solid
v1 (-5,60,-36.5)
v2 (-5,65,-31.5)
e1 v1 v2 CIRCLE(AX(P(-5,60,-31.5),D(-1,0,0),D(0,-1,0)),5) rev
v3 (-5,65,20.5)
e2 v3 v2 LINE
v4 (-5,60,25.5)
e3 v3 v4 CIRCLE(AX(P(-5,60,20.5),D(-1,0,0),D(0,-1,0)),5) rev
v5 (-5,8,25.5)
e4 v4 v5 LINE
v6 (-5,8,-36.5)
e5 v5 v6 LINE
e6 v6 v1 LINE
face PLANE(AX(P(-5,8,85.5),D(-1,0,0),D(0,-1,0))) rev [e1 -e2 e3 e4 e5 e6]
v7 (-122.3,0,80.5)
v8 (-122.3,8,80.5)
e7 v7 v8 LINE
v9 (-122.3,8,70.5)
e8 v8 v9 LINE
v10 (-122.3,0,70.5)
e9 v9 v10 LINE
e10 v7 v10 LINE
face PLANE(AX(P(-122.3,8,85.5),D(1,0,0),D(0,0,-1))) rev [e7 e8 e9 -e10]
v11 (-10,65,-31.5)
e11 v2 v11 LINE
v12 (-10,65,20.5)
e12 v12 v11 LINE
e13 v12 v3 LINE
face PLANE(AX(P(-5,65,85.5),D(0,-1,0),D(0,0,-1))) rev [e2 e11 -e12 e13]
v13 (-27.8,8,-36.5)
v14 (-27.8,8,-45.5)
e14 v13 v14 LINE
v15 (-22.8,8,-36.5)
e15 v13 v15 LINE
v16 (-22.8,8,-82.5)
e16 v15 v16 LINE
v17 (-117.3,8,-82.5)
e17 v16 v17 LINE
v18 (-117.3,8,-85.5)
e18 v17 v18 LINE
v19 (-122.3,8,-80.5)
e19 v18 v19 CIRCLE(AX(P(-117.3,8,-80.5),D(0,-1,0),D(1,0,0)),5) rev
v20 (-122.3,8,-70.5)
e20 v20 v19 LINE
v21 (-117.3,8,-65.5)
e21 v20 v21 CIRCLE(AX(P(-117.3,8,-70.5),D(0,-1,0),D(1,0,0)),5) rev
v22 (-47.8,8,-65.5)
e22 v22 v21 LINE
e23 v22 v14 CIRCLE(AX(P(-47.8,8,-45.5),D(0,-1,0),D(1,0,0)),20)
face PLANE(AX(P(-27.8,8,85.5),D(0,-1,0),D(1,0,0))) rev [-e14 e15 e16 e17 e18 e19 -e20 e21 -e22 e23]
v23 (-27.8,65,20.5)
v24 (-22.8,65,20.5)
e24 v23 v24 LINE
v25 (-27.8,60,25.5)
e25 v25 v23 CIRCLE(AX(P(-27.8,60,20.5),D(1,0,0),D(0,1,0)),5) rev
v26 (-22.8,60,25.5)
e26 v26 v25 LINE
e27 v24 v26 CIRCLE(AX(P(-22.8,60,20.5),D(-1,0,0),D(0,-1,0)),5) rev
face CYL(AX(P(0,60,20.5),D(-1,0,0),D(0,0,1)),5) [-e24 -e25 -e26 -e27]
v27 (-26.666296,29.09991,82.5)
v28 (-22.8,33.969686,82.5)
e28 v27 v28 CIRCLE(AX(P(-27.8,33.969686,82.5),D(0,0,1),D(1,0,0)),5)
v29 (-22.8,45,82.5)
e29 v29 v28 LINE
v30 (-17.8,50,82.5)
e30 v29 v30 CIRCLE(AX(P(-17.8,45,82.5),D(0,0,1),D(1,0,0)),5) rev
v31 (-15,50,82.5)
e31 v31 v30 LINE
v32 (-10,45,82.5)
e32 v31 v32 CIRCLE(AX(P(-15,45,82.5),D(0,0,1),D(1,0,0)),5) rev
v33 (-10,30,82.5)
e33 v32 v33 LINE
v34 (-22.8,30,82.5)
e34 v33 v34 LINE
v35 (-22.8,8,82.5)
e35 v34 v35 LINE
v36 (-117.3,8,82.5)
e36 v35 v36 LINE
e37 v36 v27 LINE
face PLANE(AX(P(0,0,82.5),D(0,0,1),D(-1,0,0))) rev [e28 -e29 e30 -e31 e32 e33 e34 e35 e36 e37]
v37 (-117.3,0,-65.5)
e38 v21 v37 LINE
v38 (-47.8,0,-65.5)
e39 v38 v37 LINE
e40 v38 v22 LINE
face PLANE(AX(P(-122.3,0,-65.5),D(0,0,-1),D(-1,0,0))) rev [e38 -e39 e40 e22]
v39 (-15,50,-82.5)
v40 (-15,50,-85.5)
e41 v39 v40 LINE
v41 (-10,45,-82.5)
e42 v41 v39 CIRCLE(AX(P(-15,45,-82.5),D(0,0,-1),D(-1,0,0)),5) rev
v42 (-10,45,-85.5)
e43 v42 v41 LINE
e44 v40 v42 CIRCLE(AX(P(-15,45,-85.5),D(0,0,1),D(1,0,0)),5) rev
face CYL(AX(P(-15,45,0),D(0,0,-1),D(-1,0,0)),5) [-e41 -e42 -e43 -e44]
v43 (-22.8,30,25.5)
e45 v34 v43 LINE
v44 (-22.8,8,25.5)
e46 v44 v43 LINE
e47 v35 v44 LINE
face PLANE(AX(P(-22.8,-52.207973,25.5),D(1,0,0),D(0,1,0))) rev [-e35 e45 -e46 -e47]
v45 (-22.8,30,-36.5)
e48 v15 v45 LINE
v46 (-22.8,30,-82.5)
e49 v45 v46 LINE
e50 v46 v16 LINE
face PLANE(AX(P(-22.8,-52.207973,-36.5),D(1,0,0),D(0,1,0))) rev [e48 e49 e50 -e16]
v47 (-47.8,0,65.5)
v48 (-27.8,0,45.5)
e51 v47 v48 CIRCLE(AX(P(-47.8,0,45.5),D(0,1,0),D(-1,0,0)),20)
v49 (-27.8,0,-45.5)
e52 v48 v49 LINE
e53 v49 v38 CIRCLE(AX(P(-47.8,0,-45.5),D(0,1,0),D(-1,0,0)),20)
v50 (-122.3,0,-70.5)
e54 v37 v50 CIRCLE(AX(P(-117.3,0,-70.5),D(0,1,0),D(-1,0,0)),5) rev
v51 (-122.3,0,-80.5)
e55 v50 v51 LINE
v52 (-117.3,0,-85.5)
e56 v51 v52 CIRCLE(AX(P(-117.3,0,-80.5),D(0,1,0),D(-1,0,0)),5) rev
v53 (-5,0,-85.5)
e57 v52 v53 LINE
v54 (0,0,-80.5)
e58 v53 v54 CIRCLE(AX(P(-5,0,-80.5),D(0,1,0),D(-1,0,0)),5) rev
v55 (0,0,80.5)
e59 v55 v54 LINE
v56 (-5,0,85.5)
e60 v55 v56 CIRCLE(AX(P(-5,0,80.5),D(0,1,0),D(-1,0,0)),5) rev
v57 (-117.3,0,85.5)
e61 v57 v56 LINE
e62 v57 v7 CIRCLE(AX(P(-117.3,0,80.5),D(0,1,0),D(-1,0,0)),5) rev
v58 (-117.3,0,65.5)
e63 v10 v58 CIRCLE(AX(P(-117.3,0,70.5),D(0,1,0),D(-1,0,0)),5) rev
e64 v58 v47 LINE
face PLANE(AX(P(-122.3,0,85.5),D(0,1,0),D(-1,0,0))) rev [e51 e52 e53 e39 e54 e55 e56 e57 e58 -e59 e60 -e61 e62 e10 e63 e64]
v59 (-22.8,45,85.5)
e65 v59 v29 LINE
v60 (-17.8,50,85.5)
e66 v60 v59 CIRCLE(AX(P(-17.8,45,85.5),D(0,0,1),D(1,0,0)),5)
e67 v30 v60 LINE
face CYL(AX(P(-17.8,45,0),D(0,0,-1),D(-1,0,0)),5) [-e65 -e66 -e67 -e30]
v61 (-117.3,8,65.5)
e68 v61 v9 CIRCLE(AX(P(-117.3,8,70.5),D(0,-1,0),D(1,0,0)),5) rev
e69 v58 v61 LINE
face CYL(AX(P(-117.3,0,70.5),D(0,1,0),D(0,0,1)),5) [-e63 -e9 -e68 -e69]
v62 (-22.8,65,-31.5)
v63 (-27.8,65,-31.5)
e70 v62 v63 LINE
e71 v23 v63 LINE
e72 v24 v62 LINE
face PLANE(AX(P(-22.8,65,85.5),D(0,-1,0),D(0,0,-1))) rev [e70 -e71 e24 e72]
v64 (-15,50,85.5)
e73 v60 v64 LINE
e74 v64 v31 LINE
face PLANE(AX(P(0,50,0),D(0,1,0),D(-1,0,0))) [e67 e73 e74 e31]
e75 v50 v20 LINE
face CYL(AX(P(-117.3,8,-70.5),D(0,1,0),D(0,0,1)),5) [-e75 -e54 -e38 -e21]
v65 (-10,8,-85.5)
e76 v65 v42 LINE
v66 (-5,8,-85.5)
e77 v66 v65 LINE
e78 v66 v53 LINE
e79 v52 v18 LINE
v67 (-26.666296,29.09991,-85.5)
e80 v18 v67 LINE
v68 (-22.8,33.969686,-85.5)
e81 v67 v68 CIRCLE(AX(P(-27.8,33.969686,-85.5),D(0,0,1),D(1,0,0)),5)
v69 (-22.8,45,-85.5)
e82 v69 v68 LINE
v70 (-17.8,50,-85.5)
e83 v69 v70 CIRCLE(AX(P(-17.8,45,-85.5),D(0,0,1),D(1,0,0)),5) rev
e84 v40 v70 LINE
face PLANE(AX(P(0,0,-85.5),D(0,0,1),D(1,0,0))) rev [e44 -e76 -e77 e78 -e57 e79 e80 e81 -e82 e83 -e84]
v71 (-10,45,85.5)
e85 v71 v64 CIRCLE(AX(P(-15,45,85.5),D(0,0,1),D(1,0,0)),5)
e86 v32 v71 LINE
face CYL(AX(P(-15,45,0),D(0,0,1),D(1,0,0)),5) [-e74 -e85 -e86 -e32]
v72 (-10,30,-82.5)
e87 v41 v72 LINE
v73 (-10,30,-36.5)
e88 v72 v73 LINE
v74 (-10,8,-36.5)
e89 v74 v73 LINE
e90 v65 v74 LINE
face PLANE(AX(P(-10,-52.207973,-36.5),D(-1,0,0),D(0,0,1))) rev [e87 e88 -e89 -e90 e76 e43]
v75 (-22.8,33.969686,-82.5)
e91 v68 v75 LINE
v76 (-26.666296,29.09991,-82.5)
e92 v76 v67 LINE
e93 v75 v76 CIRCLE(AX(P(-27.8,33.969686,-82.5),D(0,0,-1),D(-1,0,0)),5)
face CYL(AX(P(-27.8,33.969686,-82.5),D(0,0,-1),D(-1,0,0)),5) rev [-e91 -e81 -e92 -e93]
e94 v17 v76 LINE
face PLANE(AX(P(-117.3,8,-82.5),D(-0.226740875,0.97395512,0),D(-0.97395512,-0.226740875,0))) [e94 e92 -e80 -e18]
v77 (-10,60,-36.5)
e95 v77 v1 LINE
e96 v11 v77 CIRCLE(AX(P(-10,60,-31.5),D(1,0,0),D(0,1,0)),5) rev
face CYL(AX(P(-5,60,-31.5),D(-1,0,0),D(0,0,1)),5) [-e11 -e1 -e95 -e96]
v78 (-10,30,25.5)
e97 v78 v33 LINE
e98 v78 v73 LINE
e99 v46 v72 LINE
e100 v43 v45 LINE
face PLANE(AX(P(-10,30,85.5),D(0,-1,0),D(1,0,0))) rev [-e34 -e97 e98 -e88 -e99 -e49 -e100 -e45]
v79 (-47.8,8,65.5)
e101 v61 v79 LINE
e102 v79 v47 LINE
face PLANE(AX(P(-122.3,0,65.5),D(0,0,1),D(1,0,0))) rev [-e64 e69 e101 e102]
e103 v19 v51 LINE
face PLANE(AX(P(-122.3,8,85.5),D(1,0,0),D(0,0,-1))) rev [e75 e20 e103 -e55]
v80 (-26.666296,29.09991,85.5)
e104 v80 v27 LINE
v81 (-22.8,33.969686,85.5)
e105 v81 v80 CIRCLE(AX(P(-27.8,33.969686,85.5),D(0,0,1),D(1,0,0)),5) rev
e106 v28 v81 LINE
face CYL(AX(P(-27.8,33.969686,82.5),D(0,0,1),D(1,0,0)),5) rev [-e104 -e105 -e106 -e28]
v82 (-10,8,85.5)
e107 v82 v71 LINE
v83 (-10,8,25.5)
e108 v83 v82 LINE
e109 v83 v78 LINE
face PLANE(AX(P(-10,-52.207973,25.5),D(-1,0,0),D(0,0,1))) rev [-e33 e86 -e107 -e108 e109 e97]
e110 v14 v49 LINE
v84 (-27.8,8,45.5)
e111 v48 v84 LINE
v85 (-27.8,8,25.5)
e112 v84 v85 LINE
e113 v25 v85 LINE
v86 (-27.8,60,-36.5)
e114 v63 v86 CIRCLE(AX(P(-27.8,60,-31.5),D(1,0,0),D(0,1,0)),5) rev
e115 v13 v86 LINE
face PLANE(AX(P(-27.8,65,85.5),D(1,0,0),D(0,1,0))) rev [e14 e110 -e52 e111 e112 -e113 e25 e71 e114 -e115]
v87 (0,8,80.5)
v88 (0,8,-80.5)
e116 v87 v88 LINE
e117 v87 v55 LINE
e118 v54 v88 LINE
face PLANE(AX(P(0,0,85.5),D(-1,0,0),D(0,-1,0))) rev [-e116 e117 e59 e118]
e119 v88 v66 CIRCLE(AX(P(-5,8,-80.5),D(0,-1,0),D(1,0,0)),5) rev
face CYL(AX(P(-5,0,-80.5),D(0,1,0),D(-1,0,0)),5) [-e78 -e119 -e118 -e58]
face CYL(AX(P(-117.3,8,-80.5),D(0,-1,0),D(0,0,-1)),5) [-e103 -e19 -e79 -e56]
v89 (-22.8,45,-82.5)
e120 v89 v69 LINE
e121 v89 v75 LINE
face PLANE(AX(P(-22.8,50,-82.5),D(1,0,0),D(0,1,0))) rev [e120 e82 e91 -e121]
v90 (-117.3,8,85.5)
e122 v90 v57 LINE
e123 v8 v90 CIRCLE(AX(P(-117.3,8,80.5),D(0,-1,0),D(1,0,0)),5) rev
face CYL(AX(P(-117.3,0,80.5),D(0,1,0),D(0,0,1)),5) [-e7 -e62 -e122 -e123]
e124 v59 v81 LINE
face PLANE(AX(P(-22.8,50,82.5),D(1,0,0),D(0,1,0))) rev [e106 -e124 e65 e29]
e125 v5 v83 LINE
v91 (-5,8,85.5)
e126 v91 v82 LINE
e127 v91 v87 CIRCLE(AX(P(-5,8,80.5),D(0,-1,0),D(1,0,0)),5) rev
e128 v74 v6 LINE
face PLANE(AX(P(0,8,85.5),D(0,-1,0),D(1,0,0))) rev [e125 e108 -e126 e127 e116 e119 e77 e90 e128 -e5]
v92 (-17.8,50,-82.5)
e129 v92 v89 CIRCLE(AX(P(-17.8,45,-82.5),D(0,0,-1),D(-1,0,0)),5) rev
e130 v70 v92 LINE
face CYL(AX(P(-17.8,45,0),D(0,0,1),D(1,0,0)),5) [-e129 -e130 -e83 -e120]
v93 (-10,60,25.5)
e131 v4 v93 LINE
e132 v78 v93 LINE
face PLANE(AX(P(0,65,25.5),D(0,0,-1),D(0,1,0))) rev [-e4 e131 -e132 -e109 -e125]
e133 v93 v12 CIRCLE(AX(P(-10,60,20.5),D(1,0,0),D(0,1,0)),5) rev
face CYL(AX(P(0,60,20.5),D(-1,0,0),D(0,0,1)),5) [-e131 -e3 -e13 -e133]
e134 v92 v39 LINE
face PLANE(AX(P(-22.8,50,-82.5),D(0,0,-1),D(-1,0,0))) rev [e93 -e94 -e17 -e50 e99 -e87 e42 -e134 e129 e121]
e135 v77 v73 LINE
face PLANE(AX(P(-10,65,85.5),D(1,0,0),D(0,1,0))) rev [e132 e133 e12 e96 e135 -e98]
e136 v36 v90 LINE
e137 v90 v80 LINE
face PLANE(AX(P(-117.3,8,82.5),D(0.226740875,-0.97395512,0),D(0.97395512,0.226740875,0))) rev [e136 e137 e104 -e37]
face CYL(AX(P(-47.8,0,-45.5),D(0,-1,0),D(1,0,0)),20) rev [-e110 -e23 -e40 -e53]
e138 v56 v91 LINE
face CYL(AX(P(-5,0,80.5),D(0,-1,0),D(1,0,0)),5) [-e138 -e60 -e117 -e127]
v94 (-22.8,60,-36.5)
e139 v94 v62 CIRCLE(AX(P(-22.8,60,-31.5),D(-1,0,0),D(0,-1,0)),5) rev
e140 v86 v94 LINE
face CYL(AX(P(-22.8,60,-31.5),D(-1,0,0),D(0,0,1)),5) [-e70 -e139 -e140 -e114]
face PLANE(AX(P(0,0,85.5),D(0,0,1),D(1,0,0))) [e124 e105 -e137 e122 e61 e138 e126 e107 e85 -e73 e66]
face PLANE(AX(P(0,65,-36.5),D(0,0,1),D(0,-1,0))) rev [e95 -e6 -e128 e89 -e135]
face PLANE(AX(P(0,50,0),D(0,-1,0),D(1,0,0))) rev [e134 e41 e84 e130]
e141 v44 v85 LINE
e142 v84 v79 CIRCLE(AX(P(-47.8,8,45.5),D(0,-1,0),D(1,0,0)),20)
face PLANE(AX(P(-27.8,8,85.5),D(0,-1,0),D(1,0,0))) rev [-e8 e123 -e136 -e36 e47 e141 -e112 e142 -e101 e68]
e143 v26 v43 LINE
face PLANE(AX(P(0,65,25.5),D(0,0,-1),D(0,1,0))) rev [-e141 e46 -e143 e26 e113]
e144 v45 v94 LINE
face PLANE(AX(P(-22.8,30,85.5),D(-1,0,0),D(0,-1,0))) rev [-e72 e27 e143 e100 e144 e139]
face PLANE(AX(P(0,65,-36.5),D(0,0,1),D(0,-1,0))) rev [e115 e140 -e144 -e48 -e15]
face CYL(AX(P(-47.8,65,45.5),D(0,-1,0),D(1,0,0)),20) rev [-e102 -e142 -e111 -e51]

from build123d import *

# Parameters (mm, degrees)
P_IDAT_VYSUNUT_M1_DEPTH  = 85.5
SKICA2_W                 = 49
SKICA2_H                 = 35
SKICA2_W_2               = 60
ODEBRAT_VYSUNUT_M1_DEPTH = 144.057680675
SKICA3_W                 = 5
SKICA3_H                 = 49
SKICA3_H_2               = 60
ODEBRAT_VYSUNUT_M2_DEPTH = 22
SKICA4_W                 = 94.5
SKICA4_H                 = 131
ODEBRAT_VYSUNUT_M3_DEPTH = 160.73897458
ZAOBLIT1_R               = 5
ZAOBLIT2_R               = 20
ZAOBLIT3_R               = 5
P_IDAT_VYSUNUT_M2_DEPTH  = 3
SKICA6_W                 = 12.8
SKICA6_H                 = 3
P_IDAT_VYSUNUT_M3_DEPTH  = 20
ZAOBLIT4_R               = 5


with BuildPart() as part:
    # Skica1 → Přidat vysunutím1 (new, symmetric)
    with BuildSketch(Plane.XY):
        Polygon((-27.8, 65), (-27.8, 8), (-122.3, 8), (-122.3, 0), (0, 0), (0, 8), (-5, 8), (-5, 65), (-10, 65), (-10, 30), (-22.8, 30), (-22.8, 65), align=None)
    extrude(amount=P_IDAT_VYSUNUT_M1_DEPTH, both=True)

    # Skica2 → Odebrat vysunutím1 (cut, through all)
    with BuildSketch(Plane.ZY.offset(27.8)):
        with Locations((-61, 47.5)):
            Rectangle(SKICA2_W, SKICA2_H)
        with Locations((55.5, 47.5)):
            Rectangle(SKICA2_W_2, SKICA2_H)
    extrude(amount=-ODEBRAT_VYSUNUT_M1_DEPTH, mode=Mode.SUBTRACT)

    # Skica3 → Odebrat vysunutím2 (cut)
    with BuildSketch(Plane(origin=(0, 30, 0), x_dir=(1, 0, 0), z_dir=(0, 1, 0))):
        with Locations((-25.3, 61)):
            Rectangle(SKICA3_W, SKICA3_H)
        with Locations((-7.5, 61)):
            Rectangle(SKICA3_W, SKICA3_H)
        with Locations((-25.3, -55.5)):
            Rectangle(SKICA3_W, SKICA3_H_2)
        with Locations((-7.5, -55.5)):
            Rectangle(SKICA3_W, SKICA3_H_2)
    extrude(amount=-ODEBRAT_VYSUNUT_M2_DEPTH, mode=Mode.SUBTRACT)

    # Skica4 → Odebrat vysunutím3 (cut, through all)
    with BuildSketch(Plane(origin=(0, 8, 0), x_dir=(1, 0, 0), z_dir=(0, 1, 0))):
        with Locations((-75.05, 0)):
            Rectangle(SKICA4_W, SKICA4_H)
    extrude(amount=-ODEBRAT_VYSUNUT_M3_DEPTH, mode=Mode.SUBTRACT)

    # Zaoblit1
    zaoblit1_edges = [part.edges().sort_by_distance(p)[0] for p in [
        (0, 4, -85.5),
        (-122.3, 4, 65.5),
        (-122.3, 4, -65.5),
        (-122.3, 4, -85.5),
        (-122.3, 4, 85.5),
        (0, 4, 85.5),
    ]]
    fillet(zaoblit1_edges, radius=ZAOBLIT1_R)

    # Zaoblit2
    zaoblit2_edges = [part.edges().sort_by_distance(p)[0] for p in [
        (-27.8, 4, -65.5),
        (-27.8, 4, 65.5),
    ]]
    fillet(zaoblit2_edges, radius=ZAOBLIT2_R)

    # Zaoblit3
    zaoblit3_edges = [part.edges().sort_by_distance(p)[0] for p in [
        (-7.5, 65, -36.5),
        (-25.3, 65, -36.5),
        (-25.3, 65, 25.5),
        (-7.5, 65, 25.5),
    ]]
    fillet(zaoblit3_edges, radius=ZAOBLIT3_R)

    # Skica5 → Přidat vysunutím2 (add)
    with BuildSketch(Plane(origin=(0, 0, -85.5), x_dir=(-1, 0, 0), z_dir=(0, 0, -1))):
        Polygon((22.8, 30), (22.8, 8), (117.3, 8), align=None)
    p_idat_vysunut_m2 = extrude(amount=-P_IDAT_VYSUNUT_M2_DEPTH)

    # Zrcadlit1: Přidat vysunutím2 across plane
    add(p_idat_vysunut_m2.mirror(Plane.XY))

    # Skica6 → Přidat vysunutím3 (add)
    with BuildSketch(Plane(origin=(0, 30, 0), x_dir=(1, 0, 0), z_dir=(0, 1, 0))):
        with Locations((-16.4, 84)):
            Rectangle(SKICA6_W, SKICA6_H)
        with Locations((-16.4, -84)):
            Rectangle(SKICA6_W, SKICA6_H)
    extrude(amount=P_IDAT_VYSUNUT_M3_DEPTH)

    # Zaoblit4
    # the kernel refuses this fillet: 5 mm, written as the material it adds along each edge
    with BuildSketch(Plane(origin=(-22.8, 30, 85.5), x_dir=(0, 1, 0), z_dir=(0, 0, -1)), Plane(origin=(-22.8, 30, -85.5), x_dir=(-0.9739551200282253, -0.22674087450392655, 0), z_dir=(0, 0, 1))) as zaoblit4_piece_1:
        with BuildLine():
            CenterArc((ZAOBLIT4_R * 0.793937122558, -ZAOBLIT4_R), ZAOBLIT4_R, 90, 76.89473101)
            Line((-ZAOBLIT4_R * 0.18001799747, -ZAOBLIT4_R * 0.773259125496), (0, 0))
            Line((0, 0), (ZAOBLIT4_R * 0.793937122558, 0))
        make_face()
    extrude(amount=3)
    # the kernel refuses this fillet: 5 mm, written as the material it takes off along each edge
    with BuildSketch(Plane(origin=(-22.8, 50, -98), x_dir=(1, 0, 0), z_dir=(0, 0, 1)), Plane(origin=(-10, 50, 70), x_dir=(0, -1, 0), z_dir=(0, 0, 1))) as zaoblit4_2_piece_1:
        with BuildLine():
            CenterArc((ZAOBLIT4_R, -ZAOBLIT4_R), ZAOBLIT4_R, 90, 90)
            Line((0, -ZAOBLIT4_R), (0, 0))
            Line((0, 0), (ZAOBLIT4_R, 0))
        make_face()
    extrude(amount=28, mode=Mode.SUBTRACT)
    with BuildSketch(Plane(origin=(-10, 50, -70), x_dir=(0, -1, 0), z_dir=(0, 0, -1)), Plane(origin=(-22.8, 50, 98), x_dir=(1, 0, 0), z_dir=(0, 0, -1))) as zaoblit4_2_piece_2:
        with BuildLine():
            CenterArc((ZAOBLIT4_R, ZAOBLIT4_R), ZAOBLIT4_R, 180, 90)
            Line((0, ZAOBLIT4_R), (0, 0))
            Line((0, 0), (ZAOBLIT4_R, 0))
        make_face()
    extrude(amount=28, mode=Mode.SUBTRACT)


solid = part.part
